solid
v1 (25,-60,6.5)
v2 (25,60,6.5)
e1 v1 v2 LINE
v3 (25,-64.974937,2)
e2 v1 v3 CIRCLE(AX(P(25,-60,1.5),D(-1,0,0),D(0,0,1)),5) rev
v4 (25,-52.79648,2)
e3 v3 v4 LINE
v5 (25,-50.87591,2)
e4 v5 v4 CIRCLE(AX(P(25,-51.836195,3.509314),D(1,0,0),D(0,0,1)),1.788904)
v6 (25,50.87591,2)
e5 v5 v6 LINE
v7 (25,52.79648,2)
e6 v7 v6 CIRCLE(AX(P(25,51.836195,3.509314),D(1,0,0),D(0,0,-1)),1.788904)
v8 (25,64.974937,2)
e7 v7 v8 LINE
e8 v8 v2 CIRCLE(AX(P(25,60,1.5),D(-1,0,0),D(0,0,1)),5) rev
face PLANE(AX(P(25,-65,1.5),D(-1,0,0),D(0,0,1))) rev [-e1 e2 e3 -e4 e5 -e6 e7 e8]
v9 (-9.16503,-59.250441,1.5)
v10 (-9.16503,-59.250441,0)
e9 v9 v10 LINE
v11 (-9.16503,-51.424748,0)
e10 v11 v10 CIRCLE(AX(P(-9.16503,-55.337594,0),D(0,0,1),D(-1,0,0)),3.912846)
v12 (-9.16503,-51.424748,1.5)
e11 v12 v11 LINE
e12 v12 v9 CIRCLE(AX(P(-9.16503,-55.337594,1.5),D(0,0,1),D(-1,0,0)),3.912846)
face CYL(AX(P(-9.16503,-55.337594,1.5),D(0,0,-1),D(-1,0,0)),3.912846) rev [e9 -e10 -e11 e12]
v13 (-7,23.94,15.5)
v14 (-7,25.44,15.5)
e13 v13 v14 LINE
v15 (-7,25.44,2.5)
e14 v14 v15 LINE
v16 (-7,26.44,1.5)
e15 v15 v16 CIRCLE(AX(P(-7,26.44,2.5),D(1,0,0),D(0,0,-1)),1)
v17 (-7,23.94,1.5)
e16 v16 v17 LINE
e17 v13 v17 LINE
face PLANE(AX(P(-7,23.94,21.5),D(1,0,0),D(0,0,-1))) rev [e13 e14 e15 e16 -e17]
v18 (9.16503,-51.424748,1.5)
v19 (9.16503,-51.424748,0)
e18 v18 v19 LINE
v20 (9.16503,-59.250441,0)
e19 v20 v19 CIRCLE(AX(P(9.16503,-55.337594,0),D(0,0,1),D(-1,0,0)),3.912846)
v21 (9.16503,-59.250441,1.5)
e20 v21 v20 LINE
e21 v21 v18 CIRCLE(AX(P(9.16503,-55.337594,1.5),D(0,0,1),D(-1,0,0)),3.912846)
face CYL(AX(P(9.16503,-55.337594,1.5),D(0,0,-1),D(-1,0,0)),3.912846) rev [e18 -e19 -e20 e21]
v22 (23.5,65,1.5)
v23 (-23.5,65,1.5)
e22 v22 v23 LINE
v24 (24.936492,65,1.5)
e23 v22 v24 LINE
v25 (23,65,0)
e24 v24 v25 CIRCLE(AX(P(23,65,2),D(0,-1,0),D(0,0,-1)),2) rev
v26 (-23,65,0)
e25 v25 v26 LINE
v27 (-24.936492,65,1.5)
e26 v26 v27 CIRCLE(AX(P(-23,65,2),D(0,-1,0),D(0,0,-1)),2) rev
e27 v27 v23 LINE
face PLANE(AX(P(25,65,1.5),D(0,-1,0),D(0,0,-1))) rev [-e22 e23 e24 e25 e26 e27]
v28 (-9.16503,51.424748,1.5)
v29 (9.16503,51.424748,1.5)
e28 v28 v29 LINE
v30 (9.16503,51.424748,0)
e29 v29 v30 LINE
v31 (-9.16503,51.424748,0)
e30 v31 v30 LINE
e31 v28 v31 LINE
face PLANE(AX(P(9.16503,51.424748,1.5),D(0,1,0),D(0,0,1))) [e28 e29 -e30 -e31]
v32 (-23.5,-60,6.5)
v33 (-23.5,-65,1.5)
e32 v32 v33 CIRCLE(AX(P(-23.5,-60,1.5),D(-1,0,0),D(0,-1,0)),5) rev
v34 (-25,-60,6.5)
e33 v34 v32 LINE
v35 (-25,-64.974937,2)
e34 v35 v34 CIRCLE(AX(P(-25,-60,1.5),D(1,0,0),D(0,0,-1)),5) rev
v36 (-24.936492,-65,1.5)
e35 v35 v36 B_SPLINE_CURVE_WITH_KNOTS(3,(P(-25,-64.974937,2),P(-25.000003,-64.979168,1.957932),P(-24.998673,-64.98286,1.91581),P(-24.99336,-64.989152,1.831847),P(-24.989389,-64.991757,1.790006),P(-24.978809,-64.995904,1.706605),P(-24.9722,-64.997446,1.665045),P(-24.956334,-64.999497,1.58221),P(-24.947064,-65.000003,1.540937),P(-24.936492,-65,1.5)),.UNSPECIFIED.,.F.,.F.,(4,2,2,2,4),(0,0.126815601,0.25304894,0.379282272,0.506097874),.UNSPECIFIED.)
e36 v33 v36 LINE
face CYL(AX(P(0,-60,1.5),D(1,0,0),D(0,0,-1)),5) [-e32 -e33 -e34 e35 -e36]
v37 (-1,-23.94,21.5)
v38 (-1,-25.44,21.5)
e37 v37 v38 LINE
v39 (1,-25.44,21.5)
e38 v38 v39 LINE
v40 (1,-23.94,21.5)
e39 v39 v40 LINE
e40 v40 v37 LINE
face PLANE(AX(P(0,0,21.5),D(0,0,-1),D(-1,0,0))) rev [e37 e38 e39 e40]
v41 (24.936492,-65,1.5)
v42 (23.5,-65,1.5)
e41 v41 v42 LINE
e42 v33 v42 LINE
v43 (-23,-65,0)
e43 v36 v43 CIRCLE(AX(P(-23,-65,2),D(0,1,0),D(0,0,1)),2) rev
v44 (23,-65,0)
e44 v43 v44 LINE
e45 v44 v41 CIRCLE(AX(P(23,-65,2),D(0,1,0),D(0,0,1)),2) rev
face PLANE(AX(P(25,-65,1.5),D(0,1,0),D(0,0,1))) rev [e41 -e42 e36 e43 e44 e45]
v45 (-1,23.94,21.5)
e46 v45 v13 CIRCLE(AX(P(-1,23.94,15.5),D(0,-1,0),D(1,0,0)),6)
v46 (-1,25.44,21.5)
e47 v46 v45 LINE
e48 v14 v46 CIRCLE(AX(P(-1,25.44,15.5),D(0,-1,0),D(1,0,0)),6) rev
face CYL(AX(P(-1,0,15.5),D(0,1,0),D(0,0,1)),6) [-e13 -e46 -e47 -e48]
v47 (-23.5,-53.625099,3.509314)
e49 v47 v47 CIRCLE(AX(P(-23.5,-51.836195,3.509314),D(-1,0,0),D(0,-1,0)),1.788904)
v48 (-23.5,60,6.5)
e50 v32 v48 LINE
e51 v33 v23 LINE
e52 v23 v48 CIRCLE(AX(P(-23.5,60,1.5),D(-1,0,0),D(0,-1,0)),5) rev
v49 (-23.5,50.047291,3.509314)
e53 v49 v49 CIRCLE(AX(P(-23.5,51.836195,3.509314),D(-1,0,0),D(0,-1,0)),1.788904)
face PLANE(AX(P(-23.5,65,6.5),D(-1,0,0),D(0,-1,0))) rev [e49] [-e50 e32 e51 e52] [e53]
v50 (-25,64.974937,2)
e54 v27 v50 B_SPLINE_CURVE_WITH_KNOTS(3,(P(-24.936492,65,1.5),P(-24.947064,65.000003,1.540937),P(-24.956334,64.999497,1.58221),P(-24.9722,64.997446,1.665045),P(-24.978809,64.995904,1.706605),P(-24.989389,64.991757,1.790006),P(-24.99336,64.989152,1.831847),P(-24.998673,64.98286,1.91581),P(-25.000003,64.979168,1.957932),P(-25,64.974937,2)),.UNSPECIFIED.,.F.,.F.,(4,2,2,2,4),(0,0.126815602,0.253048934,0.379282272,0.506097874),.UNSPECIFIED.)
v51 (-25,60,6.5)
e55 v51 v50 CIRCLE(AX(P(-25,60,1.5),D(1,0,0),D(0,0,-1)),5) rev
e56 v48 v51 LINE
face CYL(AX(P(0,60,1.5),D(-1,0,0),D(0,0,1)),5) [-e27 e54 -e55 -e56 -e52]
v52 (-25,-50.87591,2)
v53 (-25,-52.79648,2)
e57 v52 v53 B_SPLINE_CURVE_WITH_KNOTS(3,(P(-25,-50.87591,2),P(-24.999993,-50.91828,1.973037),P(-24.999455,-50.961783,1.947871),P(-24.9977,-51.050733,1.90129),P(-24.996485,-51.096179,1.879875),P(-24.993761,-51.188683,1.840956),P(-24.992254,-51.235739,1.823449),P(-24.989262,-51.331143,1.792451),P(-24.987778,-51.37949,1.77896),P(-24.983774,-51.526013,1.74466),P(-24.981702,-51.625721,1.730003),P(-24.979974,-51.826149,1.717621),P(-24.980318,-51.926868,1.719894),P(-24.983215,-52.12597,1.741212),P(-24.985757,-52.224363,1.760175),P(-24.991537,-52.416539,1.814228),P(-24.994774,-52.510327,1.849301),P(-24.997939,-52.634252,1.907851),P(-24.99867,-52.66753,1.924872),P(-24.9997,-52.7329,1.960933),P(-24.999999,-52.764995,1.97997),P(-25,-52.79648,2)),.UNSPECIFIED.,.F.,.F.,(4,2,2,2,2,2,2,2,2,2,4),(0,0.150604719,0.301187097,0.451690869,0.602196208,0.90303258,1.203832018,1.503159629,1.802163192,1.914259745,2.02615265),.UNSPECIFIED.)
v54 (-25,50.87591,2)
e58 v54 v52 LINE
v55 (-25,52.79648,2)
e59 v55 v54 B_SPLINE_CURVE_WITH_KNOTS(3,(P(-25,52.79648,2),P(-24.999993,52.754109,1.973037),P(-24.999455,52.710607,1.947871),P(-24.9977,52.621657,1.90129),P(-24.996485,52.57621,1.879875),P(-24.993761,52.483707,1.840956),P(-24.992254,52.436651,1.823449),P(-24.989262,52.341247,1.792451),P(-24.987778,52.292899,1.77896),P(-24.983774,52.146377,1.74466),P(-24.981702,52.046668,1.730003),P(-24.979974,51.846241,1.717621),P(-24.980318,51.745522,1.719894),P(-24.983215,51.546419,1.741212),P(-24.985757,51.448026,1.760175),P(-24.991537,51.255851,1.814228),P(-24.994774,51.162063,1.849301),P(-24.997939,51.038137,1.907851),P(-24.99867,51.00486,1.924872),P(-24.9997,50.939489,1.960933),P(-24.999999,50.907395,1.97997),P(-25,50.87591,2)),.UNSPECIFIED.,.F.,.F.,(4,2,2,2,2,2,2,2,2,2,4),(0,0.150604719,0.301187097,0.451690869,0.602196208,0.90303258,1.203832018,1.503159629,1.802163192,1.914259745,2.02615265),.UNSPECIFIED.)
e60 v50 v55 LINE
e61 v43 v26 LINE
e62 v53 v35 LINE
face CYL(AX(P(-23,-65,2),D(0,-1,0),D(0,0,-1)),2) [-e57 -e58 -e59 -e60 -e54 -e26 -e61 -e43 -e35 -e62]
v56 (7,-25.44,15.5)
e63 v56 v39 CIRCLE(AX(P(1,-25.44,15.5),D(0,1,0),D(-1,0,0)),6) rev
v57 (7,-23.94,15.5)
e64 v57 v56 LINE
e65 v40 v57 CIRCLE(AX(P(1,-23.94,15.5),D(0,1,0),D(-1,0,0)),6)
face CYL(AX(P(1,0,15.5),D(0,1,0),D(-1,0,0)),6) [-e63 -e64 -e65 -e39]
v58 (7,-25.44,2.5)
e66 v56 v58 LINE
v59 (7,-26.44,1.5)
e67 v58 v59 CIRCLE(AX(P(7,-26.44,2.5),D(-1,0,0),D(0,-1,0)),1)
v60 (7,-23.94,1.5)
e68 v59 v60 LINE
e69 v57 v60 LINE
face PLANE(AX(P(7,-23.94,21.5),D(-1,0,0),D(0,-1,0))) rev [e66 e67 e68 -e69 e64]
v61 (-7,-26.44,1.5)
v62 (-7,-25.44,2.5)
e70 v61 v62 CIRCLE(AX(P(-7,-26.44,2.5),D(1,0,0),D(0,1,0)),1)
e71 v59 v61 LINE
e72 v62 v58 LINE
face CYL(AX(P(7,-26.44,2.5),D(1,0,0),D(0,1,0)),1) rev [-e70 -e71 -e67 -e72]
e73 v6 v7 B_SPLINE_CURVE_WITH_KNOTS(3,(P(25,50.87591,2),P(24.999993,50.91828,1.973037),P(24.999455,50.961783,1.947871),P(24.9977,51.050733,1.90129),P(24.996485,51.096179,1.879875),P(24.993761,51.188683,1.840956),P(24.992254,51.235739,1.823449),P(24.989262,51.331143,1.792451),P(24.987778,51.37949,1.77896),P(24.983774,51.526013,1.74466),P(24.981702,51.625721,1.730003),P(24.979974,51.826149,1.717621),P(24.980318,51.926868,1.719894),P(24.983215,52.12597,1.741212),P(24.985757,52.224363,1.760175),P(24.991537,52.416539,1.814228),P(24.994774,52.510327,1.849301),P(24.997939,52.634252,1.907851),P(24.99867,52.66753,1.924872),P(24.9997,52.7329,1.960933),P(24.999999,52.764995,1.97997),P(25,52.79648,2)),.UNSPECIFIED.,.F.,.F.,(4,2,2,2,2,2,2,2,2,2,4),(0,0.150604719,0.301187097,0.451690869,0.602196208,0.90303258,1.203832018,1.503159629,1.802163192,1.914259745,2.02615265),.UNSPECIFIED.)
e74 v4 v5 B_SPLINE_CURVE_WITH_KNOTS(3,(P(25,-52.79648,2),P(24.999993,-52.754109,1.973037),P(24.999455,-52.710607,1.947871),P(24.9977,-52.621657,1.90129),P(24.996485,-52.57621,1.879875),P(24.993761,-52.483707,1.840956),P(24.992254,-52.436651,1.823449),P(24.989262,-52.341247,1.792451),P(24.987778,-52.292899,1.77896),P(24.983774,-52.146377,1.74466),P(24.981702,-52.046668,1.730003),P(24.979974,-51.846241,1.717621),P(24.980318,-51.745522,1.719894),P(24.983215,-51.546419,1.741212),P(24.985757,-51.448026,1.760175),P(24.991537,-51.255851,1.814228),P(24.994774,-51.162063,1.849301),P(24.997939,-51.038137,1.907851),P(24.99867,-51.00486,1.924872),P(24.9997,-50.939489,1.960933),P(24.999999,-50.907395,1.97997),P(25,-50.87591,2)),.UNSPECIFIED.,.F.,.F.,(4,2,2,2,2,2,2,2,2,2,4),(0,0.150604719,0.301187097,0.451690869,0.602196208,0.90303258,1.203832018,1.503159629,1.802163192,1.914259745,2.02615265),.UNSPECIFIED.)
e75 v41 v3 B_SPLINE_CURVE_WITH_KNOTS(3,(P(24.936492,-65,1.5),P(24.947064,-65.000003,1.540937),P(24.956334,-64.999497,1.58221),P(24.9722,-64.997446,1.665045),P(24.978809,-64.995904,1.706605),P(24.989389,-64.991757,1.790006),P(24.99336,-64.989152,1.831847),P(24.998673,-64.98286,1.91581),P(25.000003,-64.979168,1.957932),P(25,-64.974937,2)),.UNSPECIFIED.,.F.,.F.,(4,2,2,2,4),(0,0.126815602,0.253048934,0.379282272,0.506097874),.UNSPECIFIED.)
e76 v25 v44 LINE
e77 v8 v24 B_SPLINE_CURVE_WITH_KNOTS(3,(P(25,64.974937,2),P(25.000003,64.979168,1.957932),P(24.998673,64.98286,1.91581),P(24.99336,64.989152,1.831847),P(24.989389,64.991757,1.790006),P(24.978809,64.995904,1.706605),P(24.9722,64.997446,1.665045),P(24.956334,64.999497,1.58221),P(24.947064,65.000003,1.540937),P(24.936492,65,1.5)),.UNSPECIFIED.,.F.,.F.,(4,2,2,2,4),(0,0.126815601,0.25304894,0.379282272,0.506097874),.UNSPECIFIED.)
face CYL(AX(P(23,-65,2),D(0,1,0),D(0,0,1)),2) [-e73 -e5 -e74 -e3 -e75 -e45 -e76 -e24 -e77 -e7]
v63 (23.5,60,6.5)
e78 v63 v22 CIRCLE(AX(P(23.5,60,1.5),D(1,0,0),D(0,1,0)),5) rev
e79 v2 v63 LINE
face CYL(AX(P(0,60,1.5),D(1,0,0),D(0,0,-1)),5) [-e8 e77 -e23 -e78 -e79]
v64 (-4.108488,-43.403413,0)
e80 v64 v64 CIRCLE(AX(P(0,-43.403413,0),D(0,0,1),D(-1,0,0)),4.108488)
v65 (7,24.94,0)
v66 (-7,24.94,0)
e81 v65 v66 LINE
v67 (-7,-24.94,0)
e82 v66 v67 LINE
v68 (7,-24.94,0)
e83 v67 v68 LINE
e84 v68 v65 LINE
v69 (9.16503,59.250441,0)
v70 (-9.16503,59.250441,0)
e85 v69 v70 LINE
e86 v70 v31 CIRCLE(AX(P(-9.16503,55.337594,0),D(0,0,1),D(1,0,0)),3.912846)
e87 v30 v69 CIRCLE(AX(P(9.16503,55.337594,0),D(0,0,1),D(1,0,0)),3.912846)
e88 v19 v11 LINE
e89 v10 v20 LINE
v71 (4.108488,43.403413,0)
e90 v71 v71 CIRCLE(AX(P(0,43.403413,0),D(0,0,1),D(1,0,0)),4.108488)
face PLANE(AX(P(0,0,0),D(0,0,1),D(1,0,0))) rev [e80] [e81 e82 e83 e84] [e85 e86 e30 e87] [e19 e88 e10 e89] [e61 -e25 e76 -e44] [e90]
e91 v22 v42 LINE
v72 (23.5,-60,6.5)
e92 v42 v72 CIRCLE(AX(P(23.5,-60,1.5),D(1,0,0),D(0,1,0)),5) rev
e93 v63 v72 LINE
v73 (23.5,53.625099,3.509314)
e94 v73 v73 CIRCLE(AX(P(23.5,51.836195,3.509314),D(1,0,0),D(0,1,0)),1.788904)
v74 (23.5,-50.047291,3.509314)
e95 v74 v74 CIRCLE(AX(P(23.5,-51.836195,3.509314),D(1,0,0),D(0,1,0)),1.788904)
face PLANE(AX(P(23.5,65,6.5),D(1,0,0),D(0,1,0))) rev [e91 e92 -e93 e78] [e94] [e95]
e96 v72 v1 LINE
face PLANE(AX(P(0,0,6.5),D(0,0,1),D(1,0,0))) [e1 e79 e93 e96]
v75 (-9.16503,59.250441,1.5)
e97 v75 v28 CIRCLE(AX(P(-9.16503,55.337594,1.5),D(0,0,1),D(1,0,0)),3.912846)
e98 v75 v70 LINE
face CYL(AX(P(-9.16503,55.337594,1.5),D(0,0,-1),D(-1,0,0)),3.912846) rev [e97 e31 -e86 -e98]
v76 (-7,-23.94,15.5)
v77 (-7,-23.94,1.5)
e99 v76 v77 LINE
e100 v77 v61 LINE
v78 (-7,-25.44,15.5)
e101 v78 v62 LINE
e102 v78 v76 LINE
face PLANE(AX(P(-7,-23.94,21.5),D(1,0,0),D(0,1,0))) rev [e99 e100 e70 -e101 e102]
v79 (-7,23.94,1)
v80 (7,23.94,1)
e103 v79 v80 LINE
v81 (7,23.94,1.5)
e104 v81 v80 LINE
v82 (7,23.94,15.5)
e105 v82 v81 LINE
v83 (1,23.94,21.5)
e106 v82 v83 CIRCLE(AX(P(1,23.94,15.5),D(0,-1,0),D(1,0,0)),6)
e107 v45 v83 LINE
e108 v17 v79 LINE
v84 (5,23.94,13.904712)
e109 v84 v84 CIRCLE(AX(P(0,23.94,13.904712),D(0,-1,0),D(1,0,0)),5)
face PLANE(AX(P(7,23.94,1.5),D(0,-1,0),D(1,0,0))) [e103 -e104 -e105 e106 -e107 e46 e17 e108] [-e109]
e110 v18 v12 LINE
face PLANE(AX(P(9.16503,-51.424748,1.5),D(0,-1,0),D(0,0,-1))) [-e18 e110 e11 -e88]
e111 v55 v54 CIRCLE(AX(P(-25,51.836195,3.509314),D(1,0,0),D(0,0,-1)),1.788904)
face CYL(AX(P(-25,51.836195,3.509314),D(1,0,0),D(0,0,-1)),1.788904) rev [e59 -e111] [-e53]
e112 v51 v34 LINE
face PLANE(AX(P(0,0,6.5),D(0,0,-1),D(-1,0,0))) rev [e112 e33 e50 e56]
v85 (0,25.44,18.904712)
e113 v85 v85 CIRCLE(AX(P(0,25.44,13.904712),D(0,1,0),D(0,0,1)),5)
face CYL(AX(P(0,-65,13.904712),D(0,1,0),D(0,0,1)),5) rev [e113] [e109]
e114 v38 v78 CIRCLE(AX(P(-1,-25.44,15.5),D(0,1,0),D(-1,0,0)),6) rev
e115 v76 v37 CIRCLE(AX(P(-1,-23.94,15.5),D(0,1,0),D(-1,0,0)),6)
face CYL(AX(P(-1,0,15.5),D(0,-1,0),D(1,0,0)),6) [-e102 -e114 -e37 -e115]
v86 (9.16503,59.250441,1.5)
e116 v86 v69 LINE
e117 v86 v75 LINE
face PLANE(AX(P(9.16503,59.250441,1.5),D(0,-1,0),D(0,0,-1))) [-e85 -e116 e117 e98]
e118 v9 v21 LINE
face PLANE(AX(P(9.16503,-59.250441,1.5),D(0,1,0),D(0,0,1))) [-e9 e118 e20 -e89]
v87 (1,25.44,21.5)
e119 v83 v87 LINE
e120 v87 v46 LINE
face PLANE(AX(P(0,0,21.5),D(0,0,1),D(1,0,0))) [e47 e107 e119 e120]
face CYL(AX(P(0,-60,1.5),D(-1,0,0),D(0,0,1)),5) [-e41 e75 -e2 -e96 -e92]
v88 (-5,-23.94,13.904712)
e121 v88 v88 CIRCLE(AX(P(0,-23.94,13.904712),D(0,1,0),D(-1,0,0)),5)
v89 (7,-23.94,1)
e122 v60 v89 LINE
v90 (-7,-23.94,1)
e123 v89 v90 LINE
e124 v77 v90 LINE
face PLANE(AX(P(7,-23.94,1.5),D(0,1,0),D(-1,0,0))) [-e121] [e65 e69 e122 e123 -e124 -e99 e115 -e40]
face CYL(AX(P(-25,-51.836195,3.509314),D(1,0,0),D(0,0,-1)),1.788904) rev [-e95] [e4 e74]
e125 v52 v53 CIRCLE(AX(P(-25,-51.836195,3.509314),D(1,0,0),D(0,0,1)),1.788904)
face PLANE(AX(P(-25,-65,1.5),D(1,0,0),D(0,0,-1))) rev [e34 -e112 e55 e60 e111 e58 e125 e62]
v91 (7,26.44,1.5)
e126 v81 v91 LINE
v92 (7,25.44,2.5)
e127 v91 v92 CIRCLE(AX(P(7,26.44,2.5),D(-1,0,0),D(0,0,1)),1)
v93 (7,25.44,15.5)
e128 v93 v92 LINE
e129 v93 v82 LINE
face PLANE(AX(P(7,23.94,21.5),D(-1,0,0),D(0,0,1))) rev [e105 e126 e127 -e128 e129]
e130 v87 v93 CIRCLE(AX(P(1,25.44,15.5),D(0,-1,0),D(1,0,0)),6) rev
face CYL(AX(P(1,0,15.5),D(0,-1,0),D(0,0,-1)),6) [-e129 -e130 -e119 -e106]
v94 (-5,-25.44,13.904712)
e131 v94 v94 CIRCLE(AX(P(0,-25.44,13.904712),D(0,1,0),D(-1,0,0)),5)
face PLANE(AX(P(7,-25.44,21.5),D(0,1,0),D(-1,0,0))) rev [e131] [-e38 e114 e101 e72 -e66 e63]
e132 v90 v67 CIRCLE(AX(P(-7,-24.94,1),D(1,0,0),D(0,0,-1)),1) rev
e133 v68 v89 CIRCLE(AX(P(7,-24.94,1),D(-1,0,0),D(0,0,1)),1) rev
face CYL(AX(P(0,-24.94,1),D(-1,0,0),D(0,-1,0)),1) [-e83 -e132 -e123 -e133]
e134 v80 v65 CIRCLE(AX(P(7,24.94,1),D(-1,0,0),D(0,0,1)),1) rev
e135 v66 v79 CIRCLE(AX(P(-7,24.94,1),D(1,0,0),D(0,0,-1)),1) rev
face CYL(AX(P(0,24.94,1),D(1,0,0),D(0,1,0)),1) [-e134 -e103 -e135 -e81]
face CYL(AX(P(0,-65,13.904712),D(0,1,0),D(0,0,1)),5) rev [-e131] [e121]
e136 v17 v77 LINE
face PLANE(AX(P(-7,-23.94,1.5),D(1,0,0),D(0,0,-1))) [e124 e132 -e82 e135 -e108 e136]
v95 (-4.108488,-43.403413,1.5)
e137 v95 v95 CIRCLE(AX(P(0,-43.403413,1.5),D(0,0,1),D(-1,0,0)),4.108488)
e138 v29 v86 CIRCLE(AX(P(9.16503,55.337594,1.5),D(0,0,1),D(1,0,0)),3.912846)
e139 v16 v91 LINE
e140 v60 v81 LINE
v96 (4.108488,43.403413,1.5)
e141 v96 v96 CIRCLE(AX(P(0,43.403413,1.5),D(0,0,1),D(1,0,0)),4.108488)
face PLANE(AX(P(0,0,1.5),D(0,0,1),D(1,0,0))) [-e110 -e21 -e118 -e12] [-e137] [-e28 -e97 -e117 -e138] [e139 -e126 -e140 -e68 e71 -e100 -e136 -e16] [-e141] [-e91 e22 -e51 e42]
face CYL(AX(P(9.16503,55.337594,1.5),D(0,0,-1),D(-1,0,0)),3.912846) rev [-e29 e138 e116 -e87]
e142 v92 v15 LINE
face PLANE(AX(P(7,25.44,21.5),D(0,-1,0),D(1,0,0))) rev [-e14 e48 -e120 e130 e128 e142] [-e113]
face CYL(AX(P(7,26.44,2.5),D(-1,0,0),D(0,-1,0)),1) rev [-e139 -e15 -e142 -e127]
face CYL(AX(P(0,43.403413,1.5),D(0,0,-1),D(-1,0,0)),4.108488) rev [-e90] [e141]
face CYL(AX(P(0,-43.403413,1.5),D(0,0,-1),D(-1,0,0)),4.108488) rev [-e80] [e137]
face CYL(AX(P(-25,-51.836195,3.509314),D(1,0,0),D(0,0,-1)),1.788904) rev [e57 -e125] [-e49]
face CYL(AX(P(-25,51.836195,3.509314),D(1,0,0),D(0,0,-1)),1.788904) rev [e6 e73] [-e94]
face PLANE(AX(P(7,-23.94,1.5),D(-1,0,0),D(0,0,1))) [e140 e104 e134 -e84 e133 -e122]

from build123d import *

# Parameters (mm, degrees)
SKETCH1_W           = 50
SKETCH1_H           = 130
SKETCH1_R           = 4.108488497
SKETCH1_W_2         = 14
SKETCH1_H_2         = 47.88
BOSS_EXTRUDE1_DEPTH = 1.5
SKETCH2_W           = 1.5
SKETCH2_H           = 130
BOSS_EXTRUDE2_DEPTH = 5
SKETCH3_R           = 1.78890387
CUT_EXTRUDE1_DEPTH  = 83.263296798
FILLET1_R           = 5
FILLET2_R           = 2
SKETCH4_W           = 14
SKETCH4_H           = 1.5
BOSS_EXTRUDE3_DEPTH = 20
FILLET3_R           = 6
FILLET4_R           = 1
SKETCH5_R           = 5
CUT_EXTRUDE2_DEPTH  = 97.263407498


with BuildPart() as part:
    # Sketch1 → Boss-Extrude1 (new body)
    with BuildSketch(Plane.XY):
        Rectangle(SKETCH1_W, SKETCH1_H)
        with Locations((0, 43.4034135)):
            Circle(SKETCH1_R, mode=Mode.SUBTRACT)
        with Locations(Location((0, -43.4034135, 0), (0, 0, 180))):
            Circle(SKETCH1_R, mode=Mode.SUBTRACT)
        Rectangle(SKETCH1_W_2, SKETCH1_H_2, mode=Mode.SUBTRACT)
        with BuildLine():
            Line((9.165030278, 51.424748184), (-9.165030278, 51.424748184))
            ThreePointArc((-9.165030278, 51.424748184), (-13.077876466, 55.337594372), (-9.165030278, 59.250440559))
            Line((-9.165030278, 59.250440559), (9.165030278, 59.250440559))
            ThreePointArc((9.165030278, 59.250440559), (13.077876466, 55.337594372), (9.165030278, 51.424748184))
        make_face(mode=Mode.SUBTRACT)
        with BuildLine():
            Line((9.165030278, -51.424748184), (-9.165030278, -51.424748184))
            ThreePointArc((-9.165030278, -51.424748184), (-13.077876466, -55.337594372), (-9.165030278, -59.250440559))
            Line((-9.165030278, -59.250440559), (9.165030278, -59.250440559))
            ThreePointArc((9.165030278, -59.250440559), (13.077876466, -55.337594372), (9.165030278, -51.424748184))
        make_face(mode=Mode.SUBTRACT)
    extrude(amount=BOSS_EXTRUDE1_DEPTH)

    # Sketch2 → Boss-Extrude2 (add)
    with BuildSketch(Plane.XY.offset(1.5)):
        with Locations((-24.25, 0)):
            Rectangle(SKETCH2_W, SKETCH2_H)
        with Locations((24.25, 0)):
            Rectangle(SKETCH2_W, SKETCH2_H)
    extrude(amount=BOSS_EXTRUDE2_DEPTH)

    # Sketch3 → Cut-Extrude1 (cut, through all)
    with BuildSketch(Plane(origin=(25, 0, 0), x_dir=(0, 0, -1), z_dir=(1, 0, 0))):
        with Locations((-3.509314499, 51.836194759)):
            Circle(SKETCH3_R)
        with Locations(Location((-3.509314499, -51.836194759, 0), (0, 0, 90))):
            Circle(SKETCH3_R)
    extrude(amount=-CUT_EXTRUDE1_DEPTH, mode=Mode.SUBTRACT)

    # Fillet1
    fillet1_edges = [part.edges().sort_by_distance(p)[0] for p in [
        (-24.25, -65, 6.5),
        (24.25, -65, 6.5),
        (24.25, 65, 6.5),
        (-24.25, 65, 6.5),
    ]]
    fillet(fillet1_edges, radius=FILLET1_R)

    # Fillet2
    # the kernel refuses this fillet: 2 mm, written as the material it takes off along each edge
    with BuildSketch(Plane(origin=(25, 70, 0), x_dir=(0, 0, 1), z_dir=(0, -1, 0))) as fillet2_piece_1:
        with BuildLine():
            CenterArc((FILLET2_R, FILLET2_R), FILLET2_R, 180, 90)
            Line((0, FILLET2_R), (0, 0))
            Line((0, 0), (FILLET2_R, 0))
        make_face()
    extrude(amount=140, mode=Mode.SUBTRACT)
    with BuildSketch(Plane(origin=(-25, -70, 0), x_dir=(1, 0, 0), z_dir=(0, 1, 0))) as fillet2_piece_2:
        with BuildLine():
            CenterArc((FILLET2_R, -FILLET2_R), FILLET2_R, 90, 90)
            Line((0, -FILLET2_R), (0, 0))
            Line((0, 0), (FILLET2_R, 0))
        make_face()
    extrude(amount=140, mode=Mode.SUBTRACT)

    # Sketch4 → Boss-Extrude3 (add)
    with BuildSketch(Plane.XY.offset(1.5)):
        with Locations((0, 24.69)):
            Rectangle(SKETCH4_W, SKETCH4_H)
        with Locations((0, -24.69)):
            Rectangle(SKETCH4_W, SKETCH4_H)
    extrude(amount=BOSS_EXTRUDE3_DEPTH)

    # Fillet3
    fillet3_edges = [part.edges().sort_by_distance(p)[0] for p in [
        (7, 24.69, 21.5),
        (-7, 24.69, 21.5),
        (-7, -24.69, 21.5),
        (7, -24.69, 21.5),
    ]]
    fillet(fillet3_edges, radius=FILLET3_R)

    # Fillet4
    fillet4_edges = [part.edges().sort_by_distance(p)[0] for p in [
        (0, -23.94, 0),
        (0, 23.94, 0),
        (0, 25.44, 1.5),
        (0, -25.44, 1.5),
    ]]
    fillet(fillet4_edges, radius=FILLET4_R)

    # Sketch5 → Cut-Extrude2 (cut, through all)
    with BuildSketch(Plane(origin=(0, 25.44, 0), x_dir=(1, 0, 0), z_dir=(0, 1, 0))):
        with Locations(Location((0, -13.904712179, 0), (0, 0, 180))):
            Circle(SKETCH5_R)
    extrude(amount=-CUT_EXTRUDE2_DEPTH, mode=Mode.SUBTRACT)


solid = part.part
